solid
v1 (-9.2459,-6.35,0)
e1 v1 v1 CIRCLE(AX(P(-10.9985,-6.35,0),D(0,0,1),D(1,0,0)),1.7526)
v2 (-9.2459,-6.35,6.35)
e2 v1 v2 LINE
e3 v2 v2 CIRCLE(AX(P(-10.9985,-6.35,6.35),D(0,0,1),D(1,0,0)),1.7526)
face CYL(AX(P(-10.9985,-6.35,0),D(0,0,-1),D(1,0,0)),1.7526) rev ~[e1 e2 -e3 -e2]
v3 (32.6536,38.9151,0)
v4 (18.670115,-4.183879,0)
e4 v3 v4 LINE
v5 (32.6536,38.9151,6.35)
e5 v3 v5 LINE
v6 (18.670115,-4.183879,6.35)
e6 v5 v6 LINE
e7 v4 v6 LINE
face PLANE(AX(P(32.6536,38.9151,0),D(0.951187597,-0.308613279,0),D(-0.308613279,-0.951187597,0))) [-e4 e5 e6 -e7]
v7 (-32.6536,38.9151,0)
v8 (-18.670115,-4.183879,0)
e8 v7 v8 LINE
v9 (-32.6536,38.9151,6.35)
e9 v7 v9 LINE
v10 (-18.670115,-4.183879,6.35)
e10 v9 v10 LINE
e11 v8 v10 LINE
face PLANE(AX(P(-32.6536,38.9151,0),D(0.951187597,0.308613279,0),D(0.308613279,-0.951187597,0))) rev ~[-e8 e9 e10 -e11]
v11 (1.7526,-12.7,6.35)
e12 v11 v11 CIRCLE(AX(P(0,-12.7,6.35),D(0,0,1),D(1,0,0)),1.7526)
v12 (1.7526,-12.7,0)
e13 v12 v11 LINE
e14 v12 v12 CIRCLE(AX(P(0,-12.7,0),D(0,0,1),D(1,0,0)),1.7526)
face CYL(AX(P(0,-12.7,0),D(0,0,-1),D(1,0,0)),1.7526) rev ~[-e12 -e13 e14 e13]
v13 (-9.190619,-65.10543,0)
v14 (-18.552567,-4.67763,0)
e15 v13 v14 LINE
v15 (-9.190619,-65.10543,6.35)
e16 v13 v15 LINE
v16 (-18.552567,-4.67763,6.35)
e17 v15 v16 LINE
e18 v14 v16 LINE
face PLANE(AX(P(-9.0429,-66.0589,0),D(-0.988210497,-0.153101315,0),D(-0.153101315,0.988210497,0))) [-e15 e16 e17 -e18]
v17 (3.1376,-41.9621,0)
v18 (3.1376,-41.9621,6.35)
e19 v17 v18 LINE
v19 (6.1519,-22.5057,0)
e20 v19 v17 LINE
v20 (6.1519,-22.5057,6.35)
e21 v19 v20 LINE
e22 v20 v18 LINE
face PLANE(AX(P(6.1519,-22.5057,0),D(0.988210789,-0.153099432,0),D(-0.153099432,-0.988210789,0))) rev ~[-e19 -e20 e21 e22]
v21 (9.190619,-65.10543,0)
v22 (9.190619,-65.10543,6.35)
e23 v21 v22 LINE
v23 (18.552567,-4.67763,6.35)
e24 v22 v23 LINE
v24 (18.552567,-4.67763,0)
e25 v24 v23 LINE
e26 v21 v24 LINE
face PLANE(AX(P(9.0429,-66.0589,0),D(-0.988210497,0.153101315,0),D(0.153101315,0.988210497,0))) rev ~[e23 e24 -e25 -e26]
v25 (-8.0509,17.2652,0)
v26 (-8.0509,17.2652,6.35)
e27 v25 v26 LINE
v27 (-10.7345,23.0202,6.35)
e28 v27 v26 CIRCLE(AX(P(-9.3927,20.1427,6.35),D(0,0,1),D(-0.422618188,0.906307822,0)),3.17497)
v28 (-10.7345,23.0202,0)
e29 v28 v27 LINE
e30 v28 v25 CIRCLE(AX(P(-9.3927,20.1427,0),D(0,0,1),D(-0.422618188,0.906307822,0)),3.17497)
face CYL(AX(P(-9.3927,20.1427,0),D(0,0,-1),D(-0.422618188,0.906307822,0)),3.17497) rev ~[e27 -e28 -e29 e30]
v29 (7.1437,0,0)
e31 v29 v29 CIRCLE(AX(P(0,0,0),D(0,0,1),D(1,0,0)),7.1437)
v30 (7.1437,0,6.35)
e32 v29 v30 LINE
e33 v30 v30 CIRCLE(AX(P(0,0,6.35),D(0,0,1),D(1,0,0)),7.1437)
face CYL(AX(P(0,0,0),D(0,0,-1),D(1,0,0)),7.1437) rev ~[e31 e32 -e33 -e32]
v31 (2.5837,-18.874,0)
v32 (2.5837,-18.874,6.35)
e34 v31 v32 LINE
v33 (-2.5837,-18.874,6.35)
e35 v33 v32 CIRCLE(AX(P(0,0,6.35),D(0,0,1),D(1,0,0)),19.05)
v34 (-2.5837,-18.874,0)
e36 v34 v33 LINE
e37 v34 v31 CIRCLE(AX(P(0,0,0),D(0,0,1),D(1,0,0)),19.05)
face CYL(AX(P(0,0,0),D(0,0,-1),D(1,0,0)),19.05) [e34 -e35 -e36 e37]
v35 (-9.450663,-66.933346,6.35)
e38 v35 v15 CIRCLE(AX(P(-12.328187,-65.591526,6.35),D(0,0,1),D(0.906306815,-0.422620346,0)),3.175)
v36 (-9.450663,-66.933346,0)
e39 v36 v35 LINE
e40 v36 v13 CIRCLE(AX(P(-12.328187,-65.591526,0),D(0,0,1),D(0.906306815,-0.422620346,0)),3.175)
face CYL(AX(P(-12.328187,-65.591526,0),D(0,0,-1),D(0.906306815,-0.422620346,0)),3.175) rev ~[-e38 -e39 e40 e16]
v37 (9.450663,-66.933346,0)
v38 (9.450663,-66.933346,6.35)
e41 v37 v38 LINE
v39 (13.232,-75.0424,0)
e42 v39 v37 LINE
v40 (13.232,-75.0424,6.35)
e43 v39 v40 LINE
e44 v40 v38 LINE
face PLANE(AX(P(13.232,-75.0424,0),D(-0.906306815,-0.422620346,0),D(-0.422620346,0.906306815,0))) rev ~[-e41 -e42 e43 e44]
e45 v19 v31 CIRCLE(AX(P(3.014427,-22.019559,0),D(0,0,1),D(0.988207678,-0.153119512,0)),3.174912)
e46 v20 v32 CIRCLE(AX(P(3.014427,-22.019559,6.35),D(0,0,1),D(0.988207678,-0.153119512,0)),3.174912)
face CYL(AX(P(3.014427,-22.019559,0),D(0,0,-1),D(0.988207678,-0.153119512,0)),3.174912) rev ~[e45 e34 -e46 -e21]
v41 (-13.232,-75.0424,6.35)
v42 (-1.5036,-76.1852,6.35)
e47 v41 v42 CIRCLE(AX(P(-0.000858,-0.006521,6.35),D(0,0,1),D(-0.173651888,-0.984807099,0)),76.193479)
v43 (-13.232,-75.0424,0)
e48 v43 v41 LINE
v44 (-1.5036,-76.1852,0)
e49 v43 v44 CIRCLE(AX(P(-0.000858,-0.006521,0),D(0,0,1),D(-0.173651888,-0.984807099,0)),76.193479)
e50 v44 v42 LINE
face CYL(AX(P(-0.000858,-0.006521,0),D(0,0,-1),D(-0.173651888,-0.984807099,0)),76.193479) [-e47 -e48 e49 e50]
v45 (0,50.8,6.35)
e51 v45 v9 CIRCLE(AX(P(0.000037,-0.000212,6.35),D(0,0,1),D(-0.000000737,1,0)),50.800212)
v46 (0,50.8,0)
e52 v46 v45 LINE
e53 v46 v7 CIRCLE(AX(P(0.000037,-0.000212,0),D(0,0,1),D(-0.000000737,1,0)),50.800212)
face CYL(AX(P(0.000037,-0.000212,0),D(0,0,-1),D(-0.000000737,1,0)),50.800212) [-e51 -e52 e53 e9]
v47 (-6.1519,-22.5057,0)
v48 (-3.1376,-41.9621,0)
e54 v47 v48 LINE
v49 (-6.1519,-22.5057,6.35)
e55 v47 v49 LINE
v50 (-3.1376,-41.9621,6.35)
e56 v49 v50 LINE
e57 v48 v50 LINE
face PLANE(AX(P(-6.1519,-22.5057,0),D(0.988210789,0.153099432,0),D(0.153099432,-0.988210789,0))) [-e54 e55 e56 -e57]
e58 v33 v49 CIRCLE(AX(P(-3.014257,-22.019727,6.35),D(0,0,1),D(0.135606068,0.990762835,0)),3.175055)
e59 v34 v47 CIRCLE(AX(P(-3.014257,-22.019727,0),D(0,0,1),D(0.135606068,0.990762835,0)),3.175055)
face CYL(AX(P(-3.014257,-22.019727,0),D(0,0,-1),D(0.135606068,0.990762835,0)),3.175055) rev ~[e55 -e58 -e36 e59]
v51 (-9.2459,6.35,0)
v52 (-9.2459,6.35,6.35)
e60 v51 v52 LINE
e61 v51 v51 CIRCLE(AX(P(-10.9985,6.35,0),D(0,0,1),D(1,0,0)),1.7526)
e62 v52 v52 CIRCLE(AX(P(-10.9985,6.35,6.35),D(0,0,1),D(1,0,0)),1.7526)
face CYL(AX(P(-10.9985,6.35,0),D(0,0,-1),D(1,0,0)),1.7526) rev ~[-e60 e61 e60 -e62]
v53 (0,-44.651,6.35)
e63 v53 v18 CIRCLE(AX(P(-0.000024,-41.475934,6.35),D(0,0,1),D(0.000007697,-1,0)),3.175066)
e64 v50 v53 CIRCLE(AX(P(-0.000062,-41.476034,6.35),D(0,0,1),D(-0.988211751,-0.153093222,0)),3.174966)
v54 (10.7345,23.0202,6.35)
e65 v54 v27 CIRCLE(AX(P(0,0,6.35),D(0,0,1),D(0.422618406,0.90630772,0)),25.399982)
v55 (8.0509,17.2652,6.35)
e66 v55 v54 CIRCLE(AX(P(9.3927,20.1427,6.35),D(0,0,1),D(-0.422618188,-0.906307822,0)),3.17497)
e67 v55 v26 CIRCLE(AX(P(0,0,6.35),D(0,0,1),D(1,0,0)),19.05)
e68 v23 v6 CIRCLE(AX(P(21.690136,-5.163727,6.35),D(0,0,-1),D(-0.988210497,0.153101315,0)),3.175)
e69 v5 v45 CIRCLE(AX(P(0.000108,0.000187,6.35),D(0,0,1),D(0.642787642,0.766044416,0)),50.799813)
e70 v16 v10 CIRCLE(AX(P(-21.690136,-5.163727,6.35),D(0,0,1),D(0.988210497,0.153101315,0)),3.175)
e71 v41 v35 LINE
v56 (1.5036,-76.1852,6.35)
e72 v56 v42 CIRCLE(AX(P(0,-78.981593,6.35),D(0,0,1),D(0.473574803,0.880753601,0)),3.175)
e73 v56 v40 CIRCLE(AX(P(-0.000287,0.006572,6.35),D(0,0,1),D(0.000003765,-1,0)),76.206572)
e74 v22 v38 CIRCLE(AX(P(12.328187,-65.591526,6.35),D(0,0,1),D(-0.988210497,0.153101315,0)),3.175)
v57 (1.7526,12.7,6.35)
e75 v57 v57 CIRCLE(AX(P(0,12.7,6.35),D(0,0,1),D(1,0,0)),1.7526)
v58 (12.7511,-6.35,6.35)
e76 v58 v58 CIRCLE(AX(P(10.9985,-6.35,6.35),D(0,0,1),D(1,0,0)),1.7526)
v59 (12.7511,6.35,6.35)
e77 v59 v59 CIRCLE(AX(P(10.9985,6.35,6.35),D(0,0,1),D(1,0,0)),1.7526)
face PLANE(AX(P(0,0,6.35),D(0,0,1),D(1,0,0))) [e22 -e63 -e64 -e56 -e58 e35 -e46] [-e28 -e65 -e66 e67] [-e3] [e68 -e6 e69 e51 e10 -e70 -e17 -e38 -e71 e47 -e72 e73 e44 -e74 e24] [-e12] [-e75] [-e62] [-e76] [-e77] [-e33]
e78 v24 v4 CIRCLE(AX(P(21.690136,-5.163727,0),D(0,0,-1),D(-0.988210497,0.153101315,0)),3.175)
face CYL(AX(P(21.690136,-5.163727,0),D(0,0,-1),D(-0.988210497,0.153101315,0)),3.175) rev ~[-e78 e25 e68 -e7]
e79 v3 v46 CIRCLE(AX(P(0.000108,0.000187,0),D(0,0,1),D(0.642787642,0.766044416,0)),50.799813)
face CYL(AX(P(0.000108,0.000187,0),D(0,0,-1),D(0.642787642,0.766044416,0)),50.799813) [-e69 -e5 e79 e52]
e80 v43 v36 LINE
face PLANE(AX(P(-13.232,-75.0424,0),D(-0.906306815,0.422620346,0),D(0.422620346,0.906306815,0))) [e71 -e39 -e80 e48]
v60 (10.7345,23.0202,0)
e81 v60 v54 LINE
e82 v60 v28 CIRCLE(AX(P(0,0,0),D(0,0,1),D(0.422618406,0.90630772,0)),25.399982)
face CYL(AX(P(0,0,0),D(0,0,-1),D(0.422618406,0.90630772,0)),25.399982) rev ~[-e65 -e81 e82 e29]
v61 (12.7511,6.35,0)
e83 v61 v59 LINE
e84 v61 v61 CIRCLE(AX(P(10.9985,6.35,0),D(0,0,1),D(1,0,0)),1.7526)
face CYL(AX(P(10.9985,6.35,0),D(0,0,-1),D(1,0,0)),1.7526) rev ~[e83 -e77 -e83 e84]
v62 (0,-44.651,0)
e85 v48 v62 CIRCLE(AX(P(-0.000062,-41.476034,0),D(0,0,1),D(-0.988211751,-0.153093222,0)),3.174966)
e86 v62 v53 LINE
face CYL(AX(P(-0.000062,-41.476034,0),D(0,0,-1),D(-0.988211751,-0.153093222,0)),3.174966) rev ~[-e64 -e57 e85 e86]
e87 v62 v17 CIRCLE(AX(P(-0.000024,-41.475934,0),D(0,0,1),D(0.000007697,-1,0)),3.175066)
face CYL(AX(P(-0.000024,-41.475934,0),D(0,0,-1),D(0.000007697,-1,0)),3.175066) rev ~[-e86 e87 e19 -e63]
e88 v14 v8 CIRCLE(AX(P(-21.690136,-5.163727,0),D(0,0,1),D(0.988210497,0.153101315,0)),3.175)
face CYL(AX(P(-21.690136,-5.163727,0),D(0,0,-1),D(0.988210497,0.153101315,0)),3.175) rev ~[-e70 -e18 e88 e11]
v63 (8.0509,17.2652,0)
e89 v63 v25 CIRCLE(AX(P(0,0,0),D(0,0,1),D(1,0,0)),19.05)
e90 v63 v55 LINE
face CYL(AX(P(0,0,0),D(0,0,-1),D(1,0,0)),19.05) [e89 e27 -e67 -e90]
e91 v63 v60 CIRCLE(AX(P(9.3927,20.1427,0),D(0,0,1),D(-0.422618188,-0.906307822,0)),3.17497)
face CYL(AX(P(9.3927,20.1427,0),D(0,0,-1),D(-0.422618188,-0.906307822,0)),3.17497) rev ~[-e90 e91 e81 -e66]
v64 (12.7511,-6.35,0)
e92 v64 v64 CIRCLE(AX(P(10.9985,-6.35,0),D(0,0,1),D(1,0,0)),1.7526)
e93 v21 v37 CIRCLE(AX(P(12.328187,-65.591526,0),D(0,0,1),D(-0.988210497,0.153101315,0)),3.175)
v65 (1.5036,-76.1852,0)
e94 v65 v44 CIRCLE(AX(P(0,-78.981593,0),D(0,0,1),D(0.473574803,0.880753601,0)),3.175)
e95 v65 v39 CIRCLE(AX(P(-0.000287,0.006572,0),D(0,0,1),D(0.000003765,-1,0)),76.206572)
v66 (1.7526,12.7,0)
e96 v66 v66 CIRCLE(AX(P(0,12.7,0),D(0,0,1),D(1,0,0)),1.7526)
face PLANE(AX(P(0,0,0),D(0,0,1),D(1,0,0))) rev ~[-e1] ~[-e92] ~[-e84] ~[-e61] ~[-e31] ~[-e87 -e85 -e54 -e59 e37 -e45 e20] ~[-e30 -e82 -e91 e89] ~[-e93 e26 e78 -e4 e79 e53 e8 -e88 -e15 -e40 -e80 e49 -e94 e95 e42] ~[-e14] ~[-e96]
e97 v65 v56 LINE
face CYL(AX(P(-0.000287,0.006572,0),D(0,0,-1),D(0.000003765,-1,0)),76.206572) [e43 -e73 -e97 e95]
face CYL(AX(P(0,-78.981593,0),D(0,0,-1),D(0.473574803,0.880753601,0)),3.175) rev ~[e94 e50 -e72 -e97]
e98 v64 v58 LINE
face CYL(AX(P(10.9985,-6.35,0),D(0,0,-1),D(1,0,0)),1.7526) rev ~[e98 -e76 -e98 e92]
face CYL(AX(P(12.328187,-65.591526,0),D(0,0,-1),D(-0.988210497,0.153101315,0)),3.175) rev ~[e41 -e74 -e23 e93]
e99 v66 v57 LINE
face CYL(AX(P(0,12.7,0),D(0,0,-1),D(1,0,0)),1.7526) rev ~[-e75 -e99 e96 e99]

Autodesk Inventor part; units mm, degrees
ref_plane "YZ Plane" through (0, 0, 0) normal (1, 0, 0) x (0, 1, 0)
ref_plane "XZ Plane" through (0, 0, 0) normal (0, 1, 0) x (-1, 0, 0)
ref_plane "XY Plane" through (0, 0, 0) normal (0, 0, 1) x (1, 0, 0)
sketch "Sketch1" plane through (0, 0, 0) normal (0, 0, 1) x (1, 0, 0)
  circle A0 centre (0, 0) radius 7.1437
  line L0 (0, 0) -> (0, 12.7) construction
  circle A1 centre (0, 12.7) radius 1.7526
  circle A2 centre (-10.9985, 6.35) radius 1.7526
  circle A3 centre (-10.9985, -6.35) radius 1.7526
  circle A4 centre (0, -12.7) radius 1.7526
  circle A5 centre (10.9985, -6.35) radius 1.7526
  circle A6 centre (10.9985, 6.35) radius 1.7526
  circle A7 centre (0, 0) radius 19.05
  circle A8 centre (0, 0) radius 76.2 construction
  line L1 (0, 0) -> (-13.232, -75.0424) construction
  line L2 (-13.232, -75.0424) -> (4.8119, -36.3472) construction
  line L3 (-13.232, -75.0424) -> (-9.0429, -66.0589)
  line L4 (-9.0429, -66.0589) -> (-18.8254, -2.9166)
  circle A9 centre (0, 0) radius 66.675 construction
  line L5 (0, 0) -> (0, -76.2) construction
  arc A10 (-13.232, -75.0424) -> (0, -76.2) centre (0, 0) ccw
  line L6 (13.232, -75.0424) -> (9.0429, -66.0589)
  line L7 (9.0429, -66.0589) -> (18.8254, -2.9166)
  arc A11 (0, -76.2) -> (13.232, -75.0424) centre (0, 0) ccw
  arc A12 (-2.5837, -18.874) -> (-6.1519, -22.5057) centre (-3.0143, -22.0196) ccw
  line L8 (-6.1519, -22.5057) -> (-3.1376, -41.9621)
  arc A13 (-3.1376, -41.9621) -> (0, -44.651) centre (0, -41.476) ccw
  arc A14 (6.1519, -22.5057) -> (2.5837, -18.874) centre (3.0143, -22.0196) ccw
  line L9 (6.1519, -22.5057) -> (3.1376, -41.9621)
  arc A15 (0, -44.651) -> (3.1376, -41.9621) centre (0, -41.476) ccw
  circle A16 centre (0, 0) radius 50.8 construction
  line L10 (-32.6536, 38.9151) -> (-18.1201, -5.8791)
  line L11 (-32.6536, 38.9151) -> (0, 0) construction
  arc A17 (0, 50.8) -> (-32.6536, 38.9151) centre (0, 0) ccw
  line L12 (32.6536, 38.9151) -> (18.1201, -5.8791)
  line L13 (32.6536, 38.9151) -> (0, 0) construction
  arc A18 (32.6536, 38.9151) -> (0, 50.8) centre (0, 0) ccw
  arc A19 (9.3927, 20.1427) -> (-9.3927, 20.1427) centre (0, 0) ccw construction
  arc A20 (10.7345, 23.0202) -> (-10.7345, 23.0202) centre (0, 0) ccw
  arc A21 (8.0509, 17.2652) -> (-8.0509, 17.2652) centre (0, 0) ccw
  arc A22 (8.0509, 17.2652) -> (10.7345, 23.0202) centre (9.3927, 20.1427) ccw
  arc A23 (-10.7345, 23.0202) -> (-8.0509, 17.2652) centre (-9.3927, 20.1427) ccw
  line L14 (-9.3927, 20.1427) -> (0, 0) construction
  line L15 (0, 0) -> (9.3927, 20.1427) construction
  line L16 (0, -72.9607) -> (-1.5036, -76.1852)
  line L17 (-1.5036, -76.1852) -> (0, -72.9607)
  line L18 (1.5036, -76.1852) -> (0, -72.9607)
  point P0 (-18.5915, -4.4261)
  point P1 (18.5915, -4.4261)
  point P2 (2.5837, -18.874)
  point P3 (-11.1375, -70.5506)
  point P4 (8.0509, 17.2652)
  point P5 (-8.0509, 17.2652)
  dimension "d10" = 133.35
  dimension "d0" = 14.2875
  dimension "d1" = 12.7
  dimension "d2" = 3.5052
  dimension "d5" = 360
  dimension "d7" = 38.1
  dimension "d8" = 152.4
  dimension "d9" = 15
  dimension "d11" = 10
  dimension "d12" = 6.35
  dimension "d14" = 6.35
  dimension "d15" = 9.525
  dimension "d16" = 101.6
  dimension "d17" = 80
  dimension "d18" = 50
  dimension "d19" = 3.175
  dimension "d20" = 22.225
  dimension "d25" = 11.1125
extrude "Extrusion1" add sketch "Sketch1" along normal blind 6.35 contours A7 | A7 A22 A20 A23 L4 L10 A17 A18 L12 L7 | L7 L12 A7 | L12 L7 L6 A11 L18 L16 A10 L3 L4 L10 A7 A12 L8 A13 A15 L9 A14 | A7 L10 L4
fillet "Fillet1" radius 3.175 5 edges at (18.5915, -4.4261, 3.175) (9.0429, -66.0589, 3.175) (-18.5915, -4.4261, 3.175) (-9.0429, -66.0589, 3.175) (0, -72.9607, 3.175)
sketch "Sketch2" plane through (0, 0, 6.35) normal (0, 0, 1) x (1, 0, 0)
  arc A0 (1.5036, -76.1852) -> (13.232, -75.0424) centre (0, 0) ccw projected
  circle A1 centre (0, 0) radius 76.2 construction
properties part number "Blade (Bar 3)" material "Steel, Alloy"
